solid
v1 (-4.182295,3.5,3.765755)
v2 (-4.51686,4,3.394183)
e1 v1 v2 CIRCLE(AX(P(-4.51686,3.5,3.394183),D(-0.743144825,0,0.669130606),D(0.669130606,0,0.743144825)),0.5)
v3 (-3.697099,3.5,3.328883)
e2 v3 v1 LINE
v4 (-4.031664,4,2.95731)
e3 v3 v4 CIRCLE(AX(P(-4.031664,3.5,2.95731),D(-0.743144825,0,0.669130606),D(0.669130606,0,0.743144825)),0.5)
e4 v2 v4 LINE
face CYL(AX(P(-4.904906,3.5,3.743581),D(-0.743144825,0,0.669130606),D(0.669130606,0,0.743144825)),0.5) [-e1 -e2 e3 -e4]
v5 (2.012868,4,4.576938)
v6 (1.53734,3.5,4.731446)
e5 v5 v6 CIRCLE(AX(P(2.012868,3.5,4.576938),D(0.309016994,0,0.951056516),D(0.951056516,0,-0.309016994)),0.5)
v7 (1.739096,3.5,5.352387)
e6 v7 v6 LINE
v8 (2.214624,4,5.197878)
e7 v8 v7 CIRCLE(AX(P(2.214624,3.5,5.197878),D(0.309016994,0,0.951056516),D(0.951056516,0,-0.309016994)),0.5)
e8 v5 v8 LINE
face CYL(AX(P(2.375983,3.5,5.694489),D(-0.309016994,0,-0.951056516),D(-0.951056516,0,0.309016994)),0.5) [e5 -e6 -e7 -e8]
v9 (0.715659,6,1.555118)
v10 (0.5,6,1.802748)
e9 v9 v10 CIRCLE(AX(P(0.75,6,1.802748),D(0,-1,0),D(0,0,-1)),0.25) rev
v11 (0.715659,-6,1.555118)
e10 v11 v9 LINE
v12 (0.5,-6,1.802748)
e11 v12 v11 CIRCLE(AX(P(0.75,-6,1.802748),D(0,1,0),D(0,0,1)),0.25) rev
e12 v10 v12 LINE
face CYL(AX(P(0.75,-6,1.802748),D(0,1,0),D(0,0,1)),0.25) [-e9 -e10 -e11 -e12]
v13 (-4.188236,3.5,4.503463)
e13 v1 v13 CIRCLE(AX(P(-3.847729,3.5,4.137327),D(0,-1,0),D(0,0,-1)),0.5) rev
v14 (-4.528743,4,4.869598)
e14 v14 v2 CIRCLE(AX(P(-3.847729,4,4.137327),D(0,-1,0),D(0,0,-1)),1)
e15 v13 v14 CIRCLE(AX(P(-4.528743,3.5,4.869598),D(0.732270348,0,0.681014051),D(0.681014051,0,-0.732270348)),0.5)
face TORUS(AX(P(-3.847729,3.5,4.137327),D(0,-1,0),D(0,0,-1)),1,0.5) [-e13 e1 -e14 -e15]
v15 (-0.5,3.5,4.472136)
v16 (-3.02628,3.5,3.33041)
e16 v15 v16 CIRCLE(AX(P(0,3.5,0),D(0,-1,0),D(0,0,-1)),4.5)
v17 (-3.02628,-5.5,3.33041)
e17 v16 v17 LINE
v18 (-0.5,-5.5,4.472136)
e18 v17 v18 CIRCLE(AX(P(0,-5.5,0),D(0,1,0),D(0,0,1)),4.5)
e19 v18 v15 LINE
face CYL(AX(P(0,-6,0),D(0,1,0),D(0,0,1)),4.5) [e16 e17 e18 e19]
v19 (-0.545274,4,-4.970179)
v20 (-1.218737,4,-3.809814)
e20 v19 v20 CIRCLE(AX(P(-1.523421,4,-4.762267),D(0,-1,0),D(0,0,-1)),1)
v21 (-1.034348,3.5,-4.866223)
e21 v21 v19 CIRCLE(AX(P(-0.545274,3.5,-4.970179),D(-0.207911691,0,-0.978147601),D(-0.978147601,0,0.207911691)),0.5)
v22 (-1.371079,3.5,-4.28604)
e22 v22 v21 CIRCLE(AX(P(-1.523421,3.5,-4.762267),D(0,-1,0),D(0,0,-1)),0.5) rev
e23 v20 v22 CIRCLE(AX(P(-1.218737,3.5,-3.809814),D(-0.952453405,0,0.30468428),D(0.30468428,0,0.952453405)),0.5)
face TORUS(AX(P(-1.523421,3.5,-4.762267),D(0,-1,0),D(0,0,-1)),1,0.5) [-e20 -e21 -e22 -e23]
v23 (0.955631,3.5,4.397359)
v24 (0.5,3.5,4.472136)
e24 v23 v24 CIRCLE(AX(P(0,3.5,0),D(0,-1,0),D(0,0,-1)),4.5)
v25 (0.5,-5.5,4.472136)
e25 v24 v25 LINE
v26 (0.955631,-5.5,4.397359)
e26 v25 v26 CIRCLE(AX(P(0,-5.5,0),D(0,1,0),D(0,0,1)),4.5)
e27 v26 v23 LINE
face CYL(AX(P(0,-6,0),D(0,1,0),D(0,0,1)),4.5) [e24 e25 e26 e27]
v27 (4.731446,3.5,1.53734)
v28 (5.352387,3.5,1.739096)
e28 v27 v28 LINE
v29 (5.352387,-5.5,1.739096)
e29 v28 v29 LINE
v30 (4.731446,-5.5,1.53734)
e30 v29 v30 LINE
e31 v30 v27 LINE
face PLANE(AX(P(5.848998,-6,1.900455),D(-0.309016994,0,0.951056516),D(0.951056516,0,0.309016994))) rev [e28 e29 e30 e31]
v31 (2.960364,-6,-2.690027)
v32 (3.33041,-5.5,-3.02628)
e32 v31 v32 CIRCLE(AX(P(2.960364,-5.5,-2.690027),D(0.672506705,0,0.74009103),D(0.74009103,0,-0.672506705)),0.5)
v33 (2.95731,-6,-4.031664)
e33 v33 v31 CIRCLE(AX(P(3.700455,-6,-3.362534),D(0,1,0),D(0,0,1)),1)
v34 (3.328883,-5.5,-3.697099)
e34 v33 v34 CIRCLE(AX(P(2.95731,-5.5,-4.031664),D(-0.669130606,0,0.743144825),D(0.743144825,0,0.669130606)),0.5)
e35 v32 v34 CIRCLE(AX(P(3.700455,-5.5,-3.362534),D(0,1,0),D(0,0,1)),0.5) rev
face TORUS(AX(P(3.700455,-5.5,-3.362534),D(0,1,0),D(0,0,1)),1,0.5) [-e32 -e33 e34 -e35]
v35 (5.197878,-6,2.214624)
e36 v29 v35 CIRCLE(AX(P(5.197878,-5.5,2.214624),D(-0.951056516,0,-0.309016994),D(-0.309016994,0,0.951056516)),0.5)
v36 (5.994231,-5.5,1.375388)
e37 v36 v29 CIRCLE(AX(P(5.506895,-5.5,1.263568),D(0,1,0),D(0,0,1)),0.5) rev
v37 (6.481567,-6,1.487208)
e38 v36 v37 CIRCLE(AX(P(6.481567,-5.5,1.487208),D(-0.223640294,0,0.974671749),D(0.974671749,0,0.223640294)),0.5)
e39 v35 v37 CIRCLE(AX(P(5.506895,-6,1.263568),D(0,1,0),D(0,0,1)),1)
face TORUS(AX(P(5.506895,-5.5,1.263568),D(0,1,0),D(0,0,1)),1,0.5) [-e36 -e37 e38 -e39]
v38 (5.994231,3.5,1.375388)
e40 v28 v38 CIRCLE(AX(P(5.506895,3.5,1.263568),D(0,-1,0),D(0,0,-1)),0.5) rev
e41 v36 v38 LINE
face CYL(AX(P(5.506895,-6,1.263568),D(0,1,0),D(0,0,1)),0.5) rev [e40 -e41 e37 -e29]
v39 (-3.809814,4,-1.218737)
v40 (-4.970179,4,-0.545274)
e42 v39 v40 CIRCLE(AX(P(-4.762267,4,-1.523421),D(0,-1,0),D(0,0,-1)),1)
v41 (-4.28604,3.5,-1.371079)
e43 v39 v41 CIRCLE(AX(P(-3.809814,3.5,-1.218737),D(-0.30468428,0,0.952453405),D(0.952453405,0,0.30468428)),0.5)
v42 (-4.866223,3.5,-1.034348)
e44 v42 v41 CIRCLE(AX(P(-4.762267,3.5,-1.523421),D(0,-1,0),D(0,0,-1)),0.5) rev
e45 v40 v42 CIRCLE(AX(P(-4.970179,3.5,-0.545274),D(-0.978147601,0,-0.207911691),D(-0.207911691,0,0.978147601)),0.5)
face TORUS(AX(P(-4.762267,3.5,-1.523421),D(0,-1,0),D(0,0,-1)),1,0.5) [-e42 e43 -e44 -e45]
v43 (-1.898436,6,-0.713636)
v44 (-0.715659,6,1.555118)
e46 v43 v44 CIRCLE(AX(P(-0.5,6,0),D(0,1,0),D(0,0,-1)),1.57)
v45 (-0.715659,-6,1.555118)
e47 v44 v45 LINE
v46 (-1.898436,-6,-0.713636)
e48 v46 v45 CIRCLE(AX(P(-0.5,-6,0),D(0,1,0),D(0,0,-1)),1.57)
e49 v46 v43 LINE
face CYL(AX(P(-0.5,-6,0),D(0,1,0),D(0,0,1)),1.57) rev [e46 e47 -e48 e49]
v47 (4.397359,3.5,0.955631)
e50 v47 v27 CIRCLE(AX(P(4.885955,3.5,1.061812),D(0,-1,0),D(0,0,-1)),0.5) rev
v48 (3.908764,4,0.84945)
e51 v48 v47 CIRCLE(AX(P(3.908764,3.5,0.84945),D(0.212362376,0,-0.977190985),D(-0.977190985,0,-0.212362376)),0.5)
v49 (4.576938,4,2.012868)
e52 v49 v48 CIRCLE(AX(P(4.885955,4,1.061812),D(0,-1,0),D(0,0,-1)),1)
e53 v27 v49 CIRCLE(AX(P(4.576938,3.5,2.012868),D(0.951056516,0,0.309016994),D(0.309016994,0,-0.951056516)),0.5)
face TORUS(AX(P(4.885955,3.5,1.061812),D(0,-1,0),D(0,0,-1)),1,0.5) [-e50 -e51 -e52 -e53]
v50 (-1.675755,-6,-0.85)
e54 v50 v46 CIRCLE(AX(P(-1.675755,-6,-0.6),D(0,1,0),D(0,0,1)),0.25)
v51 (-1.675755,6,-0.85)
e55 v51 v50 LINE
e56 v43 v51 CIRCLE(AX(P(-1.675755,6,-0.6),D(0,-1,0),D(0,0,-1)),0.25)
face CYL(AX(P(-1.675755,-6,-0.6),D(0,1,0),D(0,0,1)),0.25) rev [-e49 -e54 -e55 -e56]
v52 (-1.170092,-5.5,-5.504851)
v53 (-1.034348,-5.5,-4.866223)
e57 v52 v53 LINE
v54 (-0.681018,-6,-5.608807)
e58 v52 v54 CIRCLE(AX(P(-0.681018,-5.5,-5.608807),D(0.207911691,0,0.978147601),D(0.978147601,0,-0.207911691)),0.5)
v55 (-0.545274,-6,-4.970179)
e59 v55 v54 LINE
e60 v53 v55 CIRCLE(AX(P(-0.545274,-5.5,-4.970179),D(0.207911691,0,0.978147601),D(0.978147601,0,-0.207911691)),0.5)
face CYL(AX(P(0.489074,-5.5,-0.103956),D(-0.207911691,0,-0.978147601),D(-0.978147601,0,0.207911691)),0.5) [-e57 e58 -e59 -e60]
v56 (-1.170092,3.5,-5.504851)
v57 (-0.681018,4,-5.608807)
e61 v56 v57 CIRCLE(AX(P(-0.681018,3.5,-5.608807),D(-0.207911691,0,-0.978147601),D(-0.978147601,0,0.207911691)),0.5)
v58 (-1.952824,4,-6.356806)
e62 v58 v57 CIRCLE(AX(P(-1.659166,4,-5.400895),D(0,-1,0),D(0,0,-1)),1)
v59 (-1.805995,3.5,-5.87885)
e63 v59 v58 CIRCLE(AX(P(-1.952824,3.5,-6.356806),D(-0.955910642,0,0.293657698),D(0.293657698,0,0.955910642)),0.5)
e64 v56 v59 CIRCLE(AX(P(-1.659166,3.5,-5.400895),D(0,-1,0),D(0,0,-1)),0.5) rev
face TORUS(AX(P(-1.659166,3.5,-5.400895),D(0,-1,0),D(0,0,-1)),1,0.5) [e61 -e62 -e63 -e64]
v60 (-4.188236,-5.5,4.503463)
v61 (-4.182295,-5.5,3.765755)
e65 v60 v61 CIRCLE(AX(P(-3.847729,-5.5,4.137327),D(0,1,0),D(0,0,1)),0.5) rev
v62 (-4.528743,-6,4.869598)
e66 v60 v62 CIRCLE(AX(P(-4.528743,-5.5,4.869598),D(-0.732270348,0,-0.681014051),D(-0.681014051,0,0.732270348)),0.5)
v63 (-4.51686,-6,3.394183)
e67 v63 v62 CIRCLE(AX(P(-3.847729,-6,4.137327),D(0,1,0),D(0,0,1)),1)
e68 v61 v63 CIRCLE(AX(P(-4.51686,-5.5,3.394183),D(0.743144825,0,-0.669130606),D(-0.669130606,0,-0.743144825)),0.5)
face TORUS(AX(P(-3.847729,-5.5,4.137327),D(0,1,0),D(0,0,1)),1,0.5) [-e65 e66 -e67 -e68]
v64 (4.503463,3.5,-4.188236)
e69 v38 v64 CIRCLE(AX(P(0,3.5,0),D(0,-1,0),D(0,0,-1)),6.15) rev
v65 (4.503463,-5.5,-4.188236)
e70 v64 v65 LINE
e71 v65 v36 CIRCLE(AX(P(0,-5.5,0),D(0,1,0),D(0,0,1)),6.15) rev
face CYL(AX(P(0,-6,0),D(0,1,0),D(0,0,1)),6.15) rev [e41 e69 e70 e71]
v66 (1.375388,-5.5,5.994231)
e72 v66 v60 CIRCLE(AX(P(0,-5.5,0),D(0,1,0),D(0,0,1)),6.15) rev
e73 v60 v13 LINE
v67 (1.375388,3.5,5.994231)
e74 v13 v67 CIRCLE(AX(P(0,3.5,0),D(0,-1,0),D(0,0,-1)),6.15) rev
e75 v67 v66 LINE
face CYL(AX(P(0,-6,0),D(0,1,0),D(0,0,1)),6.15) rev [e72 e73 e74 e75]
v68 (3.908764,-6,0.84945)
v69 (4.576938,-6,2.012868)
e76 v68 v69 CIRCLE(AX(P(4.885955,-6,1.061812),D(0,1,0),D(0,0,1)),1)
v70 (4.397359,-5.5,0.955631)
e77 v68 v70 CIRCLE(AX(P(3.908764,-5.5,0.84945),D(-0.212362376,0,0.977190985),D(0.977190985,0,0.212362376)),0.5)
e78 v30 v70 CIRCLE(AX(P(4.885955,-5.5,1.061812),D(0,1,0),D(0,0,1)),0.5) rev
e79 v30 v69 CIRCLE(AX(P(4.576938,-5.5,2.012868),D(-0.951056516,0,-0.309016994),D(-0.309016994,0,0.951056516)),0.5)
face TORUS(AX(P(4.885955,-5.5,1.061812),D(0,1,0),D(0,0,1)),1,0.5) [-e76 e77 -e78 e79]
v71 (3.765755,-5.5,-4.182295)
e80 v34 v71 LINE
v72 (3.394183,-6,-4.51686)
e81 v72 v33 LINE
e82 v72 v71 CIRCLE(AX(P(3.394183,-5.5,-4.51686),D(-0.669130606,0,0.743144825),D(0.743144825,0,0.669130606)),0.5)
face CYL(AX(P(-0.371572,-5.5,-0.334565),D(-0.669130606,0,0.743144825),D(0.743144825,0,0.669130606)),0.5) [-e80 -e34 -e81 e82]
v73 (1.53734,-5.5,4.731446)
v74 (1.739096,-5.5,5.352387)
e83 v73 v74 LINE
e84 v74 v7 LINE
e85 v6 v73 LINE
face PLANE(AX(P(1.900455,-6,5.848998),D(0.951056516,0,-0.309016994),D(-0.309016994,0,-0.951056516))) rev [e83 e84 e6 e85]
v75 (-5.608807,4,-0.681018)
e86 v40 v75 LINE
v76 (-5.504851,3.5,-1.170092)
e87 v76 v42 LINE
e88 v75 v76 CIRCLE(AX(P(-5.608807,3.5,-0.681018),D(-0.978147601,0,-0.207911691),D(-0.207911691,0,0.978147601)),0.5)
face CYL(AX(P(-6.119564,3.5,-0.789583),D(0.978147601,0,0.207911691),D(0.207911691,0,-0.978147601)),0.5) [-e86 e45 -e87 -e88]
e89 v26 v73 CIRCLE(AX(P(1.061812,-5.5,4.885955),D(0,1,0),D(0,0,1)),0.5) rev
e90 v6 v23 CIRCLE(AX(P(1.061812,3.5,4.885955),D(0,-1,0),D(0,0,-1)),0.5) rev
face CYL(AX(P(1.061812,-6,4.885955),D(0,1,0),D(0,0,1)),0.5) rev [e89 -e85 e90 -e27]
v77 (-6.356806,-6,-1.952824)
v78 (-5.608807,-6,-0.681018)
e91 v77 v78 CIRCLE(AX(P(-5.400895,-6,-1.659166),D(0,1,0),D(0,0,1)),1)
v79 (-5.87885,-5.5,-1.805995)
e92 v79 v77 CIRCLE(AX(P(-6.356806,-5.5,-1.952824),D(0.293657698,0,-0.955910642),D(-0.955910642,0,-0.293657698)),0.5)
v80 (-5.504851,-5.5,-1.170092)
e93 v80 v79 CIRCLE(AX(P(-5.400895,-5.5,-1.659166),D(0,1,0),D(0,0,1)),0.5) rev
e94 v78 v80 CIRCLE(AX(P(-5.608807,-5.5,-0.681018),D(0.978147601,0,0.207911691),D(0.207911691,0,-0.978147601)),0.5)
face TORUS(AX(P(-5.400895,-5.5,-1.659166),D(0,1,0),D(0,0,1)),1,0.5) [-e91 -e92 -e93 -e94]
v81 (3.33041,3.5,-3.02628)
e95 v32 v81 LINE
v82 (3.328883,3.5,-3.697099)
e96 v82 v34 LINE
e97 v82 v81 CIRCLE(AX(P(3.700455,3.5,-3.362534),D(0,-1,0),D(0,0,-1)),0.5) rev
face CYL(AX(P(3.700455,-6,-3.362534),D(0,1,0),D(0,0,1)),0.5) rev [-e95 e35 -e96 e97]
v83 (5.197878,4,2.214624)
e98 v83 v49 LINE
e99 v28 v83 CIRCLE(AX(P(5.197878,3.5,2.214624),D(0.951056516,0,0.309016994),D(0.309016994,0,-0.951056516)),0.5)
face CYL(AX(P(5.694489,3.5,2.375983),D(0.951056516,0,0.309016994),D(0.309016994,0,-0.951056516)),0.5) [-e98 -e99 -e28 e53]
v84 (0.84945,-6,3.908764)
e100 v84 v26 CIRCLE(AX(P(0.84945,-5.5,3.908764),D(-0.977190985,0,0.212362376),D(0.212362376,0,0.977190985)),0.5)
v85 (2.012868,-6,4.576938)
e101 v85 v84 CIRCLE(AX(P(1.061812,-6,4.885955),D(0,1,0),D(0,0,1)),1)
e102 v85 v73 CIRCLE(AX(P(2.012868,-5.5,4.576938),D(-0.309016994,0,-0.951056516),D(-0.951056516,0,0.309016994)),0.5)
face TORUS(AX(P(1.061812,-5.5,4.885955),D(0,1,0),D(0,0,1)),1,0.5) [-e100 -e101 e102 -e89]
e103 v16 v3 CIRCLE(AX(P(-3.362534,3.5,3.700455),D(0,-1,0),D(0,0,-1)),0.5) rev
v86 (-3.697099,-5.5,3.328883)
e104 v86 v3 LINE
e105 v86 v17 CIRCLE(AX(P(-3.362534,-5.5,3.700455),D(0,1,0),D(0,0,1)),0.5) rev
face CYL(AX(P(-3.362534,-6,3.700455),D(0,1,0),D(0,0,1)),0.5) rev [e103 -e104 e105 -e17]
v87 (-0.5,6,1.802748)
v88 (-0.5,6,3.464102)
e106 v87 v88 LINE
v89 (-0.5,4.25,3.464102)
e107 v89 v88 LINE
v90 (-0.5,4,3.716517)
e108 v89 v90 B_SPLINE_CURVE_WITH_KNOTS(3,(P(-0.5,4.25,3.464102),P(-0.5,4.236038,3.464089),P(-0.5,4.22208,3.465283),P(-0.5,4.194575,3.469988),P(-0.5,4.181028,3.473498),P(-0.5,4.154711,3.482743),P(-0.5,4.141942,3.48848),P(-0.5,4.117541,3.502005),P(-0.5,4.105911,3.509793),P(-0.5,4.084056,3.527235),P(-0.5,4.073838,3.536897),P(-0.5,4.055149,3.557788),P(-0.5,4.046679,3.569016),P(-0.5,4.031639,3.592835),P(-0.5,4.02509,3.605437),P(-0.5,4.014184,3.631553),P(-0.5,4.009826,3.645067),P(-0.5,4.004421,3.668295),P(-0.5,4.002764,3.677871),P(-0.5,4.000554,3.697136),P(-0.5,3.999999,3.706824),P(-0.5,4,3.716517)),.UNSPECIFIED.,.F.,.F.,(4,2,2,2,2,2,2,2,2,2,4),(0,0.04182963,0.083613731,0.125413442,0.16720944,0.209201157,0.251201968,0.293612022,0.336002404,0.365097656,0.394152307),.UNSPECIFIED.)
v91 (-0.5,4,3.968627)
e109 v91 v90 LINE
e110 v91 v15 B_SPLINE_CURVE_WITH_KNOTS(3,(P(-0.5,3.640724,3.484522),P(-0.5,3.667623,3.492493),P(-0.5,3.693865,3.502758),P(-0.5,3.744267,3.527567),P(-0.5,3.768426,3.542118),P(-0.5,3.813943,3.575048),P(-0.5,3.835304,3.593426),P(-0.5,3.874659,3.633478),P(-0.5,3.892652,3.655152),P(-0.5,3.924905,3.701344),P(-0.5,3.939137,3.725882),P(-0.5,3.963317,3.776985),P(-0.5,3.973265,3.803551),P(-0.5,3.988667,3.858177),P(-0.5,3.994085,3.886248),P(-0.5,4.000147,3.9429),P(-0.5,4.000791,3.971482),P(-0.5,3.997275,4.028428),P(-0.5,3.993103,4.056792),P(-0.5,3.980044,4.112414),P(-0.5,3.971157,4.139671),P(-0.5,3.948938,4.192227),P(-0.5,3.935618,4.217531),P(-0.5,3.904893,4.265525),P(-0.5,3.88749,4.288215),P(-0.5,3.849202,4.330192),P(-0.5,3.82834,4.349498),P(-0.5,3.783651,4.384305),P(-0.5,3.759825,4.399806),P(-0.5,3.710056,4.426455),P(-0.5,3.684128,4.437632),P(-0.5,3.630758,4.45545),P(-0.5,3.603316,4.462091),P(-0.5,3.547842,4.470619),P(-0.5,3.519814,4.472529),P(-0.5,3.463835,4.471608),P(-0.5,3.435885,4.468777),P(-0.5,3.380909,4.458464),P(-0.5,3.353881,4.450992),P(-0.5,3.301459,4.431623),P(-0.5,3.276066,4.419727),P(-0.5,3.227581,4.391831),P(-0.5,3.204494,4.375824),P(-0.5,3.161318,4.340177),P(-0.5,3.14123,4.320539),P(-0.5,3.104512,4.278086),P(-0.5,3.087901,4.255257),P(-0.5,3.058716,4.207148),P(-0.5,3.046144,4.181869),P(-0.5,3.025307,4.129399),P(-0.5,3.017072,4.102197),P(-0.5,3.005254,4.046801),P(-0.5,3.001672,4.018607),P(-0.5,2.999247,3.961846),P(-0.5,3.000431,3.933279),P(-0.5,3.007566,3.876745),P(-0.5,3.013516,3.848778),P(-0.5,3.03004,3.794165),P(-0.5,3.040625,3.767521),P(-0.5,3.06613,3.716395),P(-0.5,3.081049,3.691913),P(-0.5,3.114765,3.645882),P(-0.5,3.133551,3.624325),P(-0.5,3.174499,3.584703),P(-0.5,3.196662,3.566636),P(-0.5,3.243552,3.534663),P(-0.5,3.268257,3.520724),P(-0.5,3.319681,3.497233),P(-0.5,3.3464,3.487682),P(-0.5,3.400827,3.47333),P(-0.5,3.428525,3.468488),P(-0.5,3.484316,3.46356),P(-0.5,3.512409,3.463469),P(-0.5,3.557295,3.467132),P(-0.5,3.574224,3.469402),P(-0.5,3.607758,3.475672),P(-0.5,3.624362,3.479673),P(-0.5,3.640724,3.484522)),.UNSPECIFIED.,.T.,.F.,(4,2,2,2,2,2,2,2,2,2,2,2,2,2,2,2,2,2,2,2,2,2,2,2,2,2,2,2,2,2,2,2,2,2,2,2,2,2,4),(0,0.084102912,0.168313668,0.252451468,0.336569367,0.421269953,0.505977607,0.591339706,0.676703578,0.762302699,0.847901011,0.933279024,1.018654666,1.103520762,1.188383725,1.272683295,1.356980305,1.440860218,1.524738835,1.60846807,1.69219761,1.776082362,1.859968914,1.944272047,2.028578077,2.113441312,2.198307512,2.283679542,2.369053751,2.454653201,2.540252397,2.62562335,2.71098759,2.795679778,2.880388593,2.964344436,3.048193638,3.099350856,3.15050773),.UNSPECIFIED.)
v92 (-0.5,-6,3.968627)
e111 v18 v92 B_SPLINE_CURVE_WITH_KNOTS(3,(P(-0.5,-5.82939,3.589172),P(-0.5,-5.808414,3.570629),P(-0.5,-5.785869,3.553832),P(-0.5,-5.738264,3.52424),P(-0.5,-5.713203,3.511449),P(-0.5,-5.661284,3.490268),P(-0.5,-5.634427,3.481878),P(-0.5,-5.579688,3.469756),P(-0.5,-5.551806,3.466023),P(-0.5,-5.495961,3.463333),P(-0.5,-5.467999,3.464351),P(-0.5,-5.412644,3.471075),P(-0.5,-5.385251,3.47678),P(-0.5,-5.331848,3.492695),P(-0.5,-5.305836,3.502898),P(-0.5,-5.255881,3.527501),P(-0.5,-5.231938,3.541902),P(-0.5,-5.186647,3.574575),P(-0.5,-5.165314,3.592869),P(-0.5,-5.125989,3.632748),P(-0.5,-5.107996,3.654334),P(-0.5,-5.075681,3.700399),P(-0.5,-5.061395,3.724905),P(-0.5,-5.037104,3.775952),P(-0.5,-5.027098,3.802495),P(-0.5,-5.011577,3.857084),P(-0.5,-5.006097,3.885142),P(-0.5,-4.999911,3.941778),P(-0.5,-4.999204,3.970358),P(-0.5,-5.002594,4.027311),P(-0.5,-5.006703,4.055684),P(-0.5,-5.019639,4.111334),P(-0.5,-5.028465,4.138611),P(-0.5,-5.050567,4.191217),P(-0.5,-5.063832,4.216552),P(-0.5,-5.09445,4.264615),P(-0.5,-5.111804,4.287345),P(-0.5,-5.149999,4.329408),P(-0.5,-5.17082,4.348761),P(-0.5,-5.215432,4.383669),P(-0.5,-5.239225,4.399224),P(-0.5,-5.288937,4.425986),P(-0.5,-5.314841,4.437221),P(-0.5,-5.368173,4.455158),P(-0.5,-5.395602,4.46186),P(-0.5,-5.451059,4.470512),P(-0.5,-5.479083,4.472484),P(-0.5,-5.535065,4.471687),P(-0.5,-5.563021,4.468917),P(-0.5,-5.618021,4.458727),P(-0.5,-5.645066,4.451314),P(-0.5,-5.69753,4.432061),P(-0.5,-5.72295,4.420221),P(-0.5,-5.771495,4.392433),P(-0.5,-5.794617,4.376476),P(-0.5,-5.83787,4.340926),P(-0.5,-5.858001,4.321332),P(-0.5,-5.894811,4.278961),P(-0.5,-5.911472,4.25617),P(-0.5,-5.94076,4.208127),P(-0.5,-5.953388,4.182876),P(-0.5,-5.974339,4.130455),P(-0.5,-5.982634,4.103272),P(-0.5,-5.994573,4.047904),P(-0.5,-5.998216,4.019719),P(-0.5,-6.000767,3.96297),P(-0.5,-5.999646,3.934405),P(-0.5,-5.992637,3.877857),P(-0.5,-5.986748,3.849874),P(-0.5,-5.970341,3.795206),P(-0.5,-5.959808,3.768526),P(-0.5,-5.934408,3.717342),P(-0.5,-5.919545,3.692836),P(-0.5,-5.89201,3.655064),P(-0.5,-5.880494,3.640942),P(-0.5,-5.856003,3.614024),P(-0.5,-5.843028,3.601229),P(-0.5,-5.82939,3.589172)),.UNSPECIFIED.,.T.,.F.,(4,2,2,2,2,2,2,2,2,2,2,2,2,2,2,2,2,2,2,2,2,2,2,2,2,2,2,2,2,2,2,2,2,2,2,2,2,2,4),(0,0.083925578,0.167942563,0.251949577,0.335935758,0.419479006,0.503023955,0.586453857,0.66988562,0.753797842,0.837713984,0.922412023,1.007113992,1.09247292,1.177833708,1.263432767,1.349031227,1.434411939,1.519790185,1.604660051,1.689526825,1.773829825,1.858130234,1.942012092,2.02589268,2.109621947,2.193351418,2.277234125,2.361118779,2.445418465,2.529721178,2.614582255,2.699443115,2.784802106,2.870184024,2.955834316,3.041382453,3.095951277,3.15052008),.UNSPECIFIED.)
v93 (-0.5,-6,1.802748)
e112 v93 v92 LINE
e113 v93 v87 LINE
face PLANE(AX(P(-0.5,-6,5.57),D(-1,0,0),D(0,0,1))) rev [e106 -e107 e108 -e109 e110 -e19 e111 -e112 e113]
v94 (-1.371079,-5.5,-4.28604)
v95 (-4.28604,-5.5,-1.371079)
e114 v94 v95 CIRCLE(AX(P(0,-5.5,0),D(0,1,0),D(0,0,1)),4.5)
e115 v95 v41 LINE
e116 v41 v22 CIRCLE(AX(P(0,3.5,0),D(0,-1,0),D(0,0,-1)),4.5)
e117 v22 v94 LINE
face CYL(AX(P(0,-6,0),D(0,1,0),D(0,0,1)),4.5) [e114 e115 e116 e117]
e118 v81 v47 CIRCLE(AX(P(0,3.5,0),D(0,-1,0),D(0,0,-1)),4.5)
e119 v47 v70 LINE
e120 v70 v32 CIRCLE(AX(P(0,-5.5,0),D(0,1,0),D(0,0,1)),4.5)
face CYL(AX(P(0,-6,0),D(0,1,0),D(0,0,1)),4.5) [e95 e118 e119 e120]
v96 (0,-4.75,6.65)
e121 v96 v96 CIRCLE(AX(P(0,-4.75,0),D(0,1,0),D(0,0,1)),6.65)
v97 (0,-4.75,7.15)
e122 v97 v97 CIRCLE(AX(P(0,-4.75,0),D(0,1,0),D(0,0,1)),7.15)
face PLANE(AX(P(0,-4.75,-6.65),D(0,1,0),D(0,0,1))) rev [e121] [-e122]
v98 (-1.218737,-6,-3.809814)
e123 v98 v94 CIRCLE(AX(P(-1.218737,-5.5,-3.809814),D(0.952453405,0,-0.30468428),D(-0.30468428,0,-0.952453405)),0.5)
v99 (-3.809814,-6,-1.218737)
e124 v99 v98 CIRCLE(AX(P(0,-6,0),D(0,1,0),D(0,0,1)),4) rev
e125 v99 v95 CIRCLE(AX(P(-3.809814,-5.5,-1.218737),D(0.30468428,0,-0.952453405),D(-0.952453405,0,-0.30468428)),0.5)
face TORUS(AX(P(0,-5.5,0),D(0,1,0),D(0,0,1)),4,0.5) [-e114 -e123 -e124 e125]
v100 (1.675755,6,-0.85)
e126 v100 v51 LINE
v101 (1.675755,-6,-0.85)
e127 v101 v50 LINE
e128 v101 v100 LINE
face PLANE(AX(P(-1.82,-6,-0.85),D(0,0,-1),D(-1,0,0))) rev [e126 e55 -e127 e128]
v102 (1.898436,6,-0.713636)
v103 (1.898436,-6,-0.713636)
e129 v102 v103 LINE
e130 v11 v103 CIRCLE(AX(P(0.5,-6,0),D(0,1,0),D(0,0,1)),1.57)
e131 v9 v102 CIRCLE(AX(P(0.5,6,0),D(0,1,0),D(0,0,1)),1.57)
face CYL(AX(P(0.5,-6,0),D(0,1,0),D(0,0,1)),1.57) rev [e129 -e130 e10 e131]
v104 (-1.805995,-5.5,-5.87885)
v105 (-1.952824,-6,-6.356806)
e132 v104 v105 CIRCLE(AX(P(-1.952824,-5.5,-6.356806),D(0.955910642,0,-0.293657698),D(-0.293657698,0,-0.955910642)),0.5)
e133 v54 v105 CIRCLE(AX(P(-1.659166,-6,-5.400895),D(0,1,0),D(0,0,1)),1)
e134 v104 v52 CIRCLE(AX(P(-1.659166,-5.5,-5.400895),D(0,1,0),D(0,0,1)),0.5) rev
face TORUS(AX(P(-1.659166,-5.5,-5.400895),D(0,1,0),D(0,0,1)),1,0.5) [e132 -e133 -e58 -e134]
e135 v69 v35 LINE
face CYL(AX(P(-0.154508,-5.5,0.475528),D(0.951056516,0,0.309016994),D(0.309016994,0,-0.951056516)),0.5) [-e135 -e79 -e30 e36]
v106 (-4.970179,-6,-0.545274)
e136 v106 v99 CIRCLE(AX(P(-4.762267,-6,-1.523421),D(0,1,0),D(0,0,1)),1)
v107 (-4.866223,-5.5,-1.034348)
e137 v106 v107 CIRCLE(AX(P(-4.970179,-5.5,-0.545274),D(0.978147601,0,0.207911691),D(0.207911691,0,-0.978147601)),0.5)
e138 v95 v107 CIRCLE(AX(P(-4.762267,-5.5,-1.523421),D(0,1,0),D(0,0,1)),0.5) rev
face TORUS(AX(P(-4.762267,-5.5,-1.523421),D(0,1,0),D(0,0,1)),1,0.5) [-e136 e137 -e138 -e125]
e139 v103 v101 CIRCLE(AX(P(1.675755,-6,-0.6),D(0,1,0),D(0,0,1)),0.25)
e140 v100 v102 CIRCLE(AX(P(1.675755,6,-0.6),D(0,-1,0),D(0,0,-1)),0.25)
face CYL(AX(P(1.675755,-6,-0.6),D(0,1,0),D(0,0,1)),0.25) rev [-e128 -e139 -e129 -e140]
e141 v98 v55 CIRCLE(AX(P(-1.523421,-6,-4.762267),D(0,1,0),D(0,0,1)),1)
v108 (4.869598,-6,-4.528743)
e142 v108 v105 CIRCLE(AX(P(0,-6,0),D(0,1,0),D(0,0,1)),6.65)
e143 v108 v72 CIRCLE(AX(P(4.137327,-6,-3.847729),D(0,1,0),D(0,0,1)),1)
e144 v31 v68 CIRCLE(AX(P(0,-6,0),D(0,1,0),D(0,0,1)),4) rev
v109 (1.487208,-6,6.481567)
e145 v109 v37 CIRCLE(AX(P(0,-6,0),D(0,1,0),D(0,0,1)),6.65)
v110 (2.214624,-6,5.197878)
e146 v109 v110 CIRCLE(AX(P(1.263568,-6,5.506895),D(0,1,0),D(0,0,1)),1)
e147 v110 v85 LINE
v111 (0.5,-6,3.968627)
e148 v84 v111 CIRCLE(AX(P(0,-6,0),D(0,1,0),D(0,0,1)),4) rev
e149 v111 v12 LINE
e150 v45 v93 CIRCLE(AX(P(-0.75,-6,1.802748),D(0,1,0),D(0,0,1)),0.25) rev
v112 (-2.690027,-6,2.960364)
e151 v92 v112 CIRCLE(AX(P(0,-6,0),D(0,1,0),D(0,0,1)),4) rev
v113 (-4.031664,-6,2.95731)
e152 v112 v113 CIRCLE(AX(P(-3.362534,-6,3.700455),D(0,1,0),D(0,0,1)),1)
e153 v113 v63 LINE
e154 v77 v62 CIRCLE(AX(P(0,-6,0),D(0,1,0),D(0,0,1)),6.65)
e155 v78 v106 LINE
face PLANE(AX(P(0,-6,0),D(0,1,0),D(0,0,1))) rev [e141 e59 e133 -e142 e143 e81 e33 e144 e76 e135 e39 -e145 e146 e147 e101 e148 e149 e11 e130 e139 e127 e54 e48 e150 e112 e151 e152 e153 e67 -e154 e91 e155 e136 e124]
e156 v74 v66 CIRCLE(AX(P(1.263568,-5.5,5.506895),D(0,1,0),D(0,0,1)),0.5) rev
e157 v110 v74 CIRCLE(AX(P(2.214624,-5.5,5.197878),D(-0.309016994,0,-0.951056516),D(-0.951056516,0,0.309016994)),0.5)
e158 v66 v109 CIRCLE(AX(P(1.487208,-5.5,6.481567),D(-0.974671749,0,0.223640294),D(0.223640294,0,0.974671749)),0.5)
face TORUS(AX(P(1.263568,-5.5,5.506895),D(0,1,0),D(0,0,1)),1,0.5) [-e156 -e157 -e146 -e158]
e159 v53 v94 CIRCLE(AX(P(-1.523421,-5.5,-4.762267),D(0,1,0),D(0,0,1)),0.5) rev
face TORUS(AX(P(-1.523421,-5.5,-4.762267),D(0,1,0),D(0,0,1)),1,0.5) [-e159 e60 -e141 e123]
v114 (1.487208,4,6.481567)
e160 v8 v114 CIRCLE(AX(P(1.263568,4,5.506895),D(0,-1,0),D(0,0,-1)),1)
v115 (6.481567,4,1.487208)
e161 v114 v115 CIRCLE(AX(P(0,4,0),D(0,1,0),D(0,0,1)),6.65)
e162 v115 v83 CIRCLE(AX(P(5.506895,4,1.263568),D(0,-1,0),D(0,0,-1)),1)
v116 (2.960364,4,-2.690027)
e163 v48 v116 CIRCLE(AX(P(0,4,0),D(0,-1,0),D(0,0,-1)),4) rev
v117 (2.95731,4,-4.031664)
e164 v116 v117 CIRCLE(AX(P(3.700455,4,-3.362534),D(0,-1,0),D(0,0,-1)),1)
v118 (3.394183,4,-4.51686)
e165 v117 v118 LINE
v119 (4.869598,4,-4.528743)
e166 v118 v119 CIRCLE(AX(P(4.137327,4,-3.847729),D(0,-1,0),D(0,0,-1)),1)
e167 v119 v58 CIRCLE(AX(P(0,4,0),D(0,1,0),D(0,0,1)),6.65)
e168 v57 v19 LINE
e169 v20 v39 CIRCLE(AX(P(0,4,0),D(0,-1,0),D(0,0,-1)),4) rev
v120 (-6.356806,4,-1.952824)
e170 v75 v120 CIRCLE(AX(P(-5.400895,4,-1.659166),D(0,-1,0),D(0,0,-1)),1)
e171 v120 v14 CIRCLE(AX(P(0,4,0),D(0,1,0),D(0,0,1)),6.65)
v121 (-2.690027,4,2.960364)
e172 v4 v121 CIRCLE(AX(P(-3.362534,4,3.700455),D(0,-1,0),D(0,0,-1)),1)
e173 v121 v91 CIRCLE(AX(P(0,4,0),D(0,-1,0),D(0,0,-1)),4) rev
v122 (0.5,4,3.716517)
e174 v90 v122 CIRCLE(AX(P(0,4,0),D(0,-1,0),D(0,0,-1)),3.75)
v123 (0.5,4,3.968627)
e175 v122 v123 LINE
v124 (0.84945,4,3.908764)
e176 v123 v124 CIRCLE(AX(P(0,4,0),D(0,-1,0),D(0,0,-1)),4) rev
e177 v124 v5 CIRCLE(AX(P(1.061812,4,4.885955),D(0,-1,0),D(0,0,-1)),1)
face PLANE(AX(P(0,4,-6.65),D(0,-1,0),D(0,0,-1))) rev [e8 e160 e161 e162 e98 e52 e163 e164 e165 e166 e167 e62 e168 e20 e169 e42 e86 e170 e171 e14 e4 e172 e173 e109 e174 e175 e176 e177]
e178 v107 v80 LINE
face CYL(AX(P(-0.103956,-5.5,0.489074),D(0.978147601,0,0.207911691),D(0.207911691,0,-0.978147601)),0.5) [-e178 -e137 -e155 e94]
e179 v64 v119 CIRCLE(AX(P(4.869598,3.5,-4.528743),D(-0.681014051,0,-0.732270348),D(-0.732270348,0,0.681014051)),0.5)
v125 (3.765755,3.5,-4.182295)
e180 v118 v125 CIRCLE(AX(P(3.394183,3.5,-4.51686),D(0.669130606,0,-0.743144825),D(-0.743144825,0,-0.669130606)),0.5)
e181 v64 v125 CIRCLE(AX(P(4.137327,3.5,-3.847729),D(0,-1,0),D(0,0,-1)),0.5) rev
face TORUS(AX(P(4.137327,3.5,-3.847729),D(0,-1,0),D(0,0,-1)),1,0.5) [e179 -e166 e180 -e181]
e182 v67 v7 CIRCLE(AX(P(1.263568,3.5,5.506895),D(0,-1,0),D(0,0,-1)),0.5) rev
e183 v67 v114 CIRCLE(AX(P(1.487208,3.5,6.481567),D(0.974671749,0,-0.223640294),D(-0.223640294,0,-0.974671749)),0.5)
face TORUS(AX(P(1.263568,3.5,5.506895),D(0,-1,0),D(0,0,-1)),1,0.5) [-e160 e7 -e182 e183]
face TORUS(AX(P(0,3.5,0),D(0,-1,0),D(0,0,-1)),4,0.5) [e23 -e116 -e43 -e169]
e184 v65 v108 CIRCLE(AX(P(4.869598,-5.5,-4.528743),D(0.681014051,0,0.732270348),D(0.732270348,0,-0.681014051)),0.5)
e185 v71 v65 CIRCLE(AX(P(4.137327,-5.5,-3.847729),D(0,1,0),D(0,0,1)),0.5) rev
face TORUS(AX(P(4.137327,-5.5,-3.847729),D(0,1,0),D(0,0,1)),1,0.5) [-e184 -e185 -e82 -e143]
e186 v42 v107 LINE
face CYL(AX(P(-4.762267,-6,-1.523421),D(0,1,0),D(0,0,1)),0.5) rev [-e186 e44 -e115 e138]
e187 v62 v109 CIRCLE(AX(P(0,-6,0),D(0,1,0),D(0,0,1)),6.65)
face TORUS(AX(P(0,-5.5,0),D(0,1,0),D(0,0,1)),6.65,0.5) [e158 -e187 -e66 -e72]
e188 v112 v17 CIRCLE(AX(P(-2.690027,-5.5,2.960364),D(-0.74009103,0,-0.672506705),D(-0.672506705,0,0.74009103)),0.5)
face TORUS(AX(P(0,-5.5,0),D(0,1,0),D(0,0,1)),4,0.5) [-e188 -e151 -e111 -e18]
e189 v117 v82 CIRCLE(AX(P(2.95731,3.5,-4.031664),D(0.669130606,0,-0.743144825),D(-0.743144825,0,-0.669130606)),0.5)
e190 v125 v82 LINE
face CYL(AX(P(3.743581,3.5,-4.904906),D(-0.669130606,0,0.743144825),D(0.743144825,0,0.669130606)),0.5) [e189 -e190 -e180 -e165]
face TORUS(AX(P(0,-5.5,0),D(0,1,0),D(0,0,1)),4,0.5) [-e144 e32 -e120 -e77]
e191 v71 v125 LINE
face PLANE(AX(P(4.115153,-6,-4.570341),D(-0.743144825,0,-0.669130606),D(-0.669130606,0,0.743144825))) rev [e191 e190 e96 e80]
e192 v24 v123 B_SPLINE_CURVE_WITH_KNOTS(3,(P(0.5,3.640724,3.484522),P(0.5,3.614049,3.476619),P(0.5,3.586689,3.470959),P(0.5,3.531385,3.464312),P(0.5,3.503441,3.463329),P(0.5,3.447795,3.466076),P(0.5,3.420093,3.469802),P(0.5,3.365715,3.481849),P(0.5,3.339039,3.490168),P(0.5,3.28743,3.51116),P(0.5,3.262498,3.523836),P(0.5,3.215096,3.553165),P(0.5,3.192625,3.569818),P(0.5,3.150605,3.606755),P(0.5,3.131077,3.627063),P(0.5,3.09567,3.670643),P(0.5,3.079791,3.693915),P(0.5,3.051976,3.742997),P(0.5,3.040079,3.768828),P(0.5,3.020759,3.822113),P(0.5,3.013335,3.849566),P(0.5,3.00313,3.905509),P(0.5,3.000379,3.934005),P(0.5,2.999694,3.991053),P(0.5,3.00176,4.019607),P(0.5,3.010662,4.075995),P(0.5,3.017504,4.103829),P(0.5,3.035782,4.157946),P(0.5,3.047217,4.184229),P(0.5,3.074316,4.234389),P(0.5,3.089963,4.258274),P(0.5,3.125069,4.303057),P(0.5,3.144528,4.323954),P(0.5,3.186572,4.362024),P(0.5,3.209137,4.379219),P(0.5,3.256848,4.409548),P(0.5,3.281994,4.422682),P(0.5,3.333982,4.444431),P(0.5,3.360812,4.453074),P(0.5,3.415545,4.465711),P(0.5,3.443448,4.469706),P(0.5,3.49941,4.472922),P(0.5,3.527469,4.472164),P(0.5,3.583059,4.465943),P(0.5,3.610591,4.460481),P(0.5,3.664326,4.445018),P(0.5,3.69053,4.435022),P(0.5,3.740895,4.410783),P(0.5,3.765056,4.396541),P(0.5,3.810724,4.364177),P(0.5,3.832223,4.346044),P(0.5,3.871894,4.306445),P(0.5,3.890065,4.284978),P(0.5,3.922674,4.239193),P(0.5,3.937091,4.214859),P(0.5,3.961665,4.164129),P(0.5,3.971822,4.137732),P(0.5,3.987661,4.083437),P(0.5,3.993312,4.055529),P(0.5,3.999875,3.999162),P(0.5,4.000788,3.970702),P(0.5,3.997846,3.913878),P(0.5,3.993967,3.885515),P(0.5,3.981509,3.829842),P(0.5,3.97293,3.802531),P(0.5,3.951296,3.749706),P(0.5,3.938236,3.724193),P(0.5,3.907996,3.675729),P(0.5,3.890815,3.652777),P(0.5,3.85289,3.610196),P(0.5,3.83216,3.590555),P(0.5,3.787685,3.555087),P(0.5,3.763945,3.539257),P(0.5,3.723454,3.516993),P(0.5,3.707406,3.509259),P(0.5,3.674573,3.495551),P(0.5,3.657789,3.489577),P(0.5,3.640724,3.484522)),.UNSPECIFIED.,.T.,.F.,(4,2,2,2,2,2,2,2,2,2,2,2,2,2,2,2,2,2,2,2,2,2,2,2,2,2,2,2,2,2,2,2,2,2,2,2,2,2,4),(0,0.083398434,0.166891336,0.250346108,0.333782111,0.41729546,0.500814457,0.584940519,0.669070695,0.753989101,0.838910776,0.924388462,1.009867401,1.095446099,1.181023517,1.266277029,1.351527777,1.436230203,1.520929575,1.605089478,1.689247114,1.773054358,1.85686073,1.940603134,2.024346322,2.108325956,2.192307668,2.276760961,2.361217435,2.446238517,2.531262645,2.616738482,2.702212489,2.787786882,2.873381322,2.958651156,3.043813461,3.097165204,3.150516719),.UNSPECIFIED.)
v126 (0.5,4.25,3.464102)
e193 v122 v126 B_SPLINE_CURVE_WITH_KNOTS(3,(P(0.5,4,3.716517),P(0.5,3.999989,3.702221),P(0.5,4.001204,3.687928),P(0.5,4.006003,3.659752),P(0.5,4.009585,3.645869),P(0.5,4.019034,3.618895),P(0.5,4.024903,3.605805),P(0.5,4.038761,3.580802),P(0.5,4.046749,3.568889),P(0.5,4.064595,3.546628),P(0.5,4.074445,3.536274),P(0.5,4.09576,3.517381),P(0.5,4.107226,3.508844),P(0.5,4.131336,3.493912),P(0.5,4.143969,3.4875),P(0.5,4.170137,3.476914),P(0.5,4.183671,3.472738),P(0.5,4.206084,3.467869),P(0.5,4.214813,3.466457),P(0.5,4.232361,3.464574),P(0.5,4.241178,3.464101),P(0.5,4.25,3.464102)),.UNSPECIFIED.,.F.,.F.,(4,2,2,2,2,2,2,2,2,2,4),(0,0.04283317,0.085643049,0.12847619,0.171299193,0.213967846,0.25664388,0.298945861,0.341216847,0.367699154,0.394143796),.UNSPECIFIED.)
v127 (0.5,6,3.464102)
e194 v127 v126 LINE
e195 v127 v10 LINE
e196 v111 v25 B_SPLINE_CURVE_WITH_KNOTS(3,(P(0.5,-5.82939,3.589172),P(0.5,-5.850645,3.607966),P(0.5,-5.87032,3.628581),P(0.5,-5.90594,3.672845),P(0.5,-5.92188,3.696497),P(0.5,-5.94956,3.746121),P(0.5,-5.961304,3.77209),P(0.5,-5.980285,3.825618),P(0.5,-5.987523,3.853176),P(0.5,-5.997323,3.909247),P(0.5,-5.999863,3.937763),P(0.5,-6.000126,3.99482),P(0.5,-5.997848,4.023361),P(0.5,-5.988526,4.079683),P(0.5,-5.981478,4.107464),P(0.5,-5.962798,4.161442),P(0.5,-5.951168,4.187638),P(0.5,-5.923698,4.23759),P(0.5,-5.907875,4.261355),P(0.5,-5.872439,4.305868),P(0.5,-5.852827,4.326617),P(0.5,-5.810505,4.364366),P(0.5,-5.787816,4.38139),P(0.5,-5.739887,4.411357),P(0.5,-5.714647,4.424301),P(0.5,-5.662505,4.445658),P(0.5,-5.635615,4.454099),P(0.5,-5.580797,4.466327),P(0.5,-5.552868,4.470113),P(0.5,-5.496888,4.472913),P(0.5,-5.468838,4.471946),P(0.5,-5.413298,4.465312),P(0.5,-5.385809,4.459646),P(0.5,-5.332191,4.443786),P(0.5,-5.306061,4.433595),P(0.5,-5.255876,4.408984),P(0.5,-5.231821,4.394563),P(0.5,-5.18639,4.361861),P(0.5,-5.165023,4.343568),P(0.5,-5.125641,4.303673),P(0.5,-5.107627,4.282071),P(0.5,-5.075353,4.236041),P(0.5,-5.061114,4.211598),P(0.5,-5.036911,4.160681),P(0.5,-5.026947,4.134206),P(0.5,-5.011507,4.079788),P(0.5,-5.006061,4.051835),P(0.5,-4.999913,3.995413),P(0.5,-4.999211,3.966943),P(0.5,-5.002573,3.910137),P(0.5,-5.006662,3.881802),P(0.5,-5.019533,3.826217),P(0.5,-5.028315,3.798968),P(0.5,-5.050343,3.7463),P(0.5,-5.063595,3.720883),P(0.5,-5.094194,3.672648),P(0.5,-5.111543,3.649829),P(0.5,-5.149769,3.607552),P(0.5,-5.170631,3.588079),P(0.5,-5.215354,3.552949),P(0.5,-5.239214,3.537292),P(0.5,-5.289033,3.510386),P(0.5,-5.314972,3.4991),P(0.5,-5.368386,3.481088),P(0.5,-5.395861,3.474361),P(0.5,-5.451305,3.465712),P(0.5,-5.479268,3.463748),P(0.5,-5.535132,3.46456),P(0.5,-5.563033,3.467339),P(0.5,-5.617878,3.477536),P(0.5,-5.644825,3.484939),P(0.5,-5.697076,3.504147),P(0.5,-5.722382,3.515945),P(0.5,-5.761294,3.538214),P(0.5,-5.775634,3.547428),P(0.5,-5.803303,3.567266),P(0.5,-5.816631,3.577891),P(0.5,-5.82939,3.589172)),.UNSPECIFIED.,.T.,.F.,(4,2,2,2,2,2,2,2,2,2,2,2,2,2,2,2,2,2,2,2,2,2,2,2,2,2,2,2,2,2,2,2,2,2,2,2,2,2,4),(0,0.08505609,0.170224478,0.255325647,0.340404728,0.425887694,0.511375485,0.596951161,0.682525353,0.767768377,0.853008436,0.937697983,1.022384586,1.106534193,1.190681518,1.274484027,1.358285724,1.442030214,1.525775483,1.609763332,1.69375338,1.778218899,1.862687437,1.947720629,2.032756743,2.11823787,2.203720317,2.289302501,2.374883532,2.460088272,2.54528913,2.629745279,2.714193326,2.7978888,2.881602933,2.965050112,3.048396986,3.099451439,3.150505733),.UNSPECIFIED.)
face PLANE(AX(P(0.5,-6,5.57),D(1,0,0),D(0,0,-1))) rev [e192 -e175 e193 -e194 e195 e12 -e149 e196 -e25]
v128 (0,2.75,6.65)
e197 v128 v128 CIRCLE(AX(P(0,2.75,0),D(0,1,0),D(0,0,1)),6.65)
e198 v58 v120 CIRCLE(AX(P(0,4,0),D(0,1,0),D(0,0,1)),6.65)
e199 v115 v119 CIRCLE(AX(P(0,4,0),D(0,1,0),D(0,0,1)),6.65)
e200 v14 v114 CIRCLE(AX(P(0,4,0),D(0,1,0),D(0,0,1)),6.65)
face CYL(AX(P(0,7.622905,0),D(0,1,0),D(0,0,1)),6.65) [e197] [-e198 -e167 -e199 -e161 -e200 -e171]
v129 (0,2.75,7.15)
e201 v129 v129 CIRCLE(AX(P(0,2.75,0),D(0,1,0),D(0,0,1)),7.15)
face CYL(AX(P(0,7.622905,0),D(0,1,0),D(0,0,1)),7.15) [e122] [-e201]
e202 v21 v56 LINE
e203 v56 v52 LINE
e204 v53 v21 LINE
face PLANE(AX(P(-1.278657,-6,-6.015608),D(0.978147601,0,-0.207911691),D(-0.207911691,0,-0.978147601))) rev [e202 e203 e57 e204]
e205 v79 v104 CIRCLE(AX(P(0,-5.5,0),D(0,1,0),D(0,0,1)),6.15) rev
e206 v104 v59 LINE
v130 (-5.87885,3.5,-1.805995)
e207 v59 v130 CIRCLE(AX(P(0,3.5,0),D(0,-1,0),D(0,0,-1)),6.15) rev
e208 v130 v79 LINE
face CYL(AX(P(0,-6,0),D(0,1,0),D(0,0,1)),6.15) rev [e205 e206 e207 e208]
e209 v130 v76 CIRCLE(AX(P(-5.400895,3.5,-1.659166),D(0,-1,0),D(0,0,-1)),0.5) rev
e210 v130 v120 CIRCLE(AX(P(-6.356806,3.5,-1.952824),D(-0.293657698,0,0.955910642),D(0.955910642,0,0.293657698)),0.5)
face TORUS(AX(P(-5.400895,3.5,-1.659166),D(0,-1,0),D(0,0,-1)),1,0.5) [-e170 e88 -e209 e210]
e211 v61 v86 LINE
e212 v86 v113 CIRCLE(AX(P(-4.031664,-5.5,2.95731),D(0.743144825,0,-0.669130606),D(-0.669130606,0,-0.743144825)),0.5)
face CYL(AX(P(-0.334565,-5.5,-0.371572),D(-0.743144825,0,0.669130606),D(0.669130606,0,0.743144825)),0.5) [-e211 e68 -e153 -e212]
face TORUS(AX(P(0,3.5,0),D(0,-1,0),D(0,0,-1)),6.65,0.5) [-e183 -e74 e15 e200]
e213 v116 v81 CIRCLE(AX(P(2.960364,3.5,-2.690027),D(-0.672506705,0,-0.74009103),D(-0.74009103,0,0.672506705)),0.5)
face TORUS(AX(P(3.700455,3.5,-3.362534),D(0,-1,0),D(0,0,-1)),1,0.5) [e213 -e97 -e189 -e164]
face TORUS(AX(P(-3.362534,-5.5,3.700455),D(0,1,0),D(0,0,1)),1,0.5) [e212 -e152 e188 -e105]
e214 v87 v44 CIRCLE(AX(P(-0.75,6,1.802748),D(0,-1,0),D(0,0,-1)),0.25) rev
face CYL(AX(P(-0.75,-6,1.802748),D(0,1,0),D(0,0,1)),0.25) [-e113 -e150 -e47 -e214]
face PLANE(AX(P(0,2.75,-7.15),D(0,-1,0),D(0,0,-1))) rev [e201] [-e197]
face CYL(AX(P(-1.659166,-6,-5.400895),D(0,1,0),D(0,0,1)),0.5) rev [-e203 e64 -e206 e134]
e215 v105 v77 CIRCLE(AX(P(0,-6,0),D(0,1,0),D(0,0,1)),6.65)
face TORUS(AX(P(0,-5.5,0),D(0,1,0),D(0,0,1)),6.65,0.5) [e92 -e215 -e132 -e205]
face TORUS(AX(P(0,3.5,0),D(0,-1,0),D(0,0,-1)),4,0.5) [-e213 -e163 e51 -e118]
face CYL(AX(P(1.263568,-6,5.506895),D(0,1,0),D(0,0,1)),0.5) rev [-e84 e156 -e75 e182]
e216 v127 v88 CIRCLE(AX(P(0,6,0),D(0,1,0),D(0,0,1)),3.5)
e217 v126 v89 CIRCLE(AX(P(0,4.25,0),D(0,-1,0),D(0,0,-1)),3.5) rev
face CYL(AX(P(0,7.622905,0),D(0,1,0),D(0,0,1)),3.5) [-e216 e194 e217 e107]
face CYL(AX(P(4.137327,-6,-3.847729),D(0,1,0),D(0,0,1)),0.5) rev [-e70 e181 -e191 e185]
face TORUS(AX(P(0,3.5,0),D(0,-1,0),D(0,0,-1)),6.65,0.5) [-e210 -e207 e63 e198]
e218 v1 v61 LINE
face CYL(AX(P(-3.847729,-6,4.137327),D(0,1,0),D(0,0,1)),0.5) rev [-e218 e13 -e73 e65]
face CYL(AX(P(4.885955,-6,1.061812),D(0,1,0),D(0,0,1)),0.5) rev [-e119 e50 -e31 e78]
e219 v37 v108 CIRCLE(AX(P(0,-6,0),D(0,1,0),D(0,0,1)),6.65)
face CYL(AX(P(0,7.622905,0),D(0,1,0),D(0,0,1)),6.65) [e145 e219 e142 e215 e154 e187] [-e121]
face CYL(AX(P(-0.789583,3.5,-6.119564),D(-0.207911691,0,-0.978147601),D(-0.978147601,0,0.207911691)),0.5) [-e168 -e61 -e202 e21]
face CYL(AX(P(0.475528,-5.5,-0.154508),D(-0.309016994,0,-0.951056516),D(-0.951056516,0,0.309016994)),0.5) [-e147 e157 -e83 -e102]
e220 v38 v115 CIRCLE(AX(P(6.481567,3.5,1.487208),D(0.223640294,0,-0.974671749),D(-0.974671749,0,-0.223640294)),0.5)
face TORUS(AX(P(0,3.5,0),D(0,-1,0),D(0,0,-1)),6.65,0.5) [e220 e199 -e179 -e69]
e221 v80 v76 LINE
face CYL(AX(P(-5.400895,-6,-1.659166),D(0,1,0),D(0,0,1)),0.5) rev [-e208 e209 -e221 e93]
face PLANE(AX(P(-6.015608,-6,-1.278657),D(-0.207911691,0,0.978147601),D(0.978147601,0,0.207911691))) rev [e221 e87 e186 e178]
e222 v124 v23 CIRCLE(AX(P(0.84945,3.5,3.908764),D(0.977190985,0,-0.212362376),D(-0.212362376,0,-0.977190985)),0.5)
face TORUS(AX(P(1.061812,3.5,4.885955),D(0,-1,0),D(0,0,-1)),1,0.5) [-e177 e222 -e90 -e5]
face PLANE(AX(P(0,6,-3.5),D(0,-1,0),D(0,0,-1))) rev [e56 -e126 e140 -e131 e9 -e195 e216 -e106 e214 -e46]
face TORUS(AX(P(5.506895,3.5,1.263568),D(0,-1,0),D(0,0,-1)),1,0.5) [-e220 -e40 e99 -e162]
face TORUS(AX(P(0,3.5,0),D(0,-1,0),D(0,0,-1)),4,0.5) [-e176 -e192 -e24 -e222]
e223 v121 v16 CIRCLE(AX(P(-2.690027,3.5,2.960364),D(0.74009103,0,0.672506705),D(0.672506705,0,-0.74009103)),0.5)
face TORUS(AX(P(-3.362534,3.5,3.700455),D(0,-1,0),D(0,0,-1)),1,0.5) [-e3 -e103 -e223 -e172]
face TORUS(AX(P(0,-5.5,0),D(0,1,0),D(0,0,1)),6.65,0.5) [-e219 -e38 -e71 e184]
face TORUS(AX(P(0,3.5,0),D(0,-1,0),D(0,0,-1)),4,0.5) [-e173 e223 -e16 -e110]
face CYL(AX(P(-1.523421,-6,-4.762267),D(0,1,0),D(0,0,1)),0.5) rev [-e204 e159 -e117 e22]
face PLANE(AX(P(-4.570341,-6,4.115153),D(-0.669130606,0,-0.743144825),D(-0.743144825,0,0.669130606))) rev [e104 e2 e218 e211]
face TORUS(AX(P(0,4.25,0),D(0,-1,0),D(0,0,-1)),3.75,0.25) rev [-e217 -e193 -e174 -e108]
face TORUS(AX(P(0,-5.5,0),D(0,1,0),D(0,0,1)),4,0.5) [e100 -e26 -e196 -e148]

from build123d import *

# Parameters (mm, degrees)
CUT_EXTRUDE1_DEPTH       = 15.221286862
FILLET1_R                = 0.5
FILLET2_R                = 0.5
CIRPATTERN1_COUNT        = 3
FILLET1_OF_CIRPATTERN1_R = 0.5
FILLET2_OF_CIRPATTERN1_R = 0.5
CUT_EXTRUDE3_DEPTH       = 16.692195589
FILLET3_R                = 0.25
FILLET4_R                = 0.25


with BuildPart() as part:
    # Sketch1 → Revolve1 (revolve)
    with BuildSketch(Plane(origin=(0, 0, 0), x_dir=(0, 0, -1), z_dir=(1, 0, 0)), mode=Mode.PRIVATE) as revolve1_sk:
        Polygon((0, -6), (6.65, -6), (6.65, -4.75), (7.15, -4.75), (7.15, 2.75), (6.65, 2.75), (6.65, 4), (3.5, 4), (3.5, 6), (0, 6), align=None)
    revolve(revolve1_sk.sketch.rotate(Axis((0, 7.622905435, 0), (0, -1, 0)), 180), axis=Axis((0, 7.622905435, 0), (0, -1, 0)))

    # Sketch2 → Cut-Extrude1 (cut, through all)
    with BuildSketch(Plane(origin=(0, 4, 0), x_dir=(1, 0, 0), z_dir=(0, 1, 0))):
        with BuildLine():
            Line((-1.278656899, 6.015607745), (-0.935602609, 4.401664203))
            ThreePointArc((-0.935602609, 4.401664203), (-3.181980515, 3.181980515), (-4.401664203, 0.935602609))
            Line((-4.401664203, 0.935602609), (-6.015607745, 1.278656899))
            ThreePointArc((-6.015607745, 1.278656899), (-4.348706704, 4.348706704), (-1.278656899, 6.015607745))
        make_face()
    cut_extrude1 = extrude(amount=-CUT_EXTRUDE1_DEPTH, mode=Mode.SUBTRACT)

    # Fillet1
    fillet1_edges = [part.edges().sort_by_distance(p)[0] for p in [
        (-6.015607745, -1, -1.278656899),
        (-1.278656899, -1, -6.015607745),
        (-0.935602609, -1, -4.401664203),
        (-4.401664203, -1, -0.935602609),
    ]]
    fillet(fillet1_edges, radius=FILLET1_R)

    # Fillet2
    fillet2_edges = [part.edges().sort_by_distance(p)[0] for p in [
        (-3.181980515, 4, -3.181980515),
        (-3.181980515, -6, -3.181980515),
        (-5.185536923, 4, -1.102219899),
        (-5.185536923, -6, -1.102219899),
        (-4.348706704, 4, -4.348706704),
        (-4.348706704, -6, -4.348706704),
        (-1.102219899, 4, -5.185536923),
        (-1.102219899, -6, -5.185536923),
        (-4.511282066, 4, -1.090978863),
        (-4.511282066, -6, -1.090978863),
        (-1.405686601, 4, -5.831880276),
        (-1.405686601, -6, -5.831880276),
        (-5.831880276, 4, -1.405686601),
        (-5.831880276, -6, -1.405686601),
        (-1.090978863, 4, -4.511282066),
        (-1.090978863, -6, -4.511282066),
    ]]
    fillet(fillet2_edges, radius=FILLET2_R - 0.0001)  # a hair under: the kernel refuses the full size

    # CirPattern1: Cut-Extrude1 ×3 about axis
    cirpattern1_axis = Axis((0, 0, 0), (0, 1, 0))
    for i in range(1, CIRPATTERN1_COUNT):
        add(cut_extrude1.rotate(cirpattern1_axis, i * 360 / CIRPATTERN1_COUNT), mode=Mode.SUBTRACT)

    # Fillet1 of CirPattern1
    fillet1_of_cirpattern1_edges = [part.edges().sort_by_distance(p)[0] for p in [
        (1.900454515, -1, 5.848997575),
        (-4.570340677, -1, 4.115153229),
        (-3.344151715, -1, 3.011087729),
        (1.390576475, -1, 4.279754323),
        (4.115153229, -1, -4.570340677),
        (5.848997575, -1, 1.900454515),
        (4.279754323, -1, 1.390576475),
        (3.011087729, -1, -3.344151715),
    ]]
    fillet(fillet1_of_cirpattern1_edges, radius=FILLET1_OF_CIRPATTERN1_R)

    # Fillet2 of CirPattern1
    fillet2_of_cirpattern1_edges = [part.edges().sort_by_distance(p)[0] for p in [
        (-1.164685703, 4, 4.346666218),
        (-1.164685703, -6, 4.346666218),
        (1.638218029, 4, 5.041916657),
        (1.638218029, -6, 5.041916657),
        (-1.591737127, 4, 5.940443832),
        (-1.591737127, -6, 5.940443832),
        (-3.939696758, 4, 3.547318895),
        (-3.939696758, -6, 3.547318895),
        (1.310825622, 4, 4.452374304),
        (1.310825622, -6, 4.452374304),
        (-4.34771317, 4, 4.133300444),
        (-4.34771317, -6, 4.133300444),
        (1.698579831, 4, 5.753399771),
        (1.698579831, -6, 5.753399771),
        (-3.361395441, 4, 3.200456444),
        (-3.361395441, -6, 3.200456444),
        (4.346666218, 4, -1.164685703),
        (4.346666218, -6, -1.164685703),
        (3.547318895, 4, -3.939696758),
        (3.547318895, -6, -3.939696758),
        (5.940443832, 4, -1.591737127),
        (5.940443832, -6, -1.591737127),
        (5.041916657, 4, 1.638218029),
        (5.041916657, -6, 1.638218029),
        (3.200456444, 4, -3.361395441),
        (3.200456444, -6, -3.361395441),
        (5.753399771, 4, 1.698579831),
        (5.753399771, -6, 1.698579831),
        (4.133300444, 4, -4.34771317),
        (4.133300444, -6, -4.34771317),
        (4.452374304, 4, 1.310825622),
        (4.452374304, -6, 1.310825622),
    ]]
    fillet(fillet2_of_cirpattern1_edges, radius=FILLET2_OF_CIRPATTERN1_R - 0.0001)  # a hair under: the kernel refuses the full size

    # Sketch3 → Cut-Extrude3 (cut, through all)
    with BuildSketch(Plane(origin=(0, 6, 0), x_dir=(1, 0, 0), z_dir=(0, 1, 0))):
        with BuildLine():
            Line((-0.5, -5.57), (-0.5, -1.57))
            ThreePointArc((-0.5, -1.57), (-1.878296049, -0.751797845), (-1.82, 0.85))
            Line((-1.82, 0.85), (1.82, 0.85))
            ThreePointArc((1.82, 0.85), (1.878296049, -0.751797845), (0.5, -1.57))
            Line((0.5, -1.57), (0.5, -5.57))
            Line((0.5, -5.57), (-0.5, -5.57))
        make_face()
    extrude(amount=-CUT_EXTRUDE3_DEPTH, mode=Mode.SUBTRACT)

    # Fillet3
    fillet3_edges = [part.edges().sort_by_distance(p)[0] for p in [
        (0.5, 0, 1.57),
        (-0.5, 0, 1.57),
        (-1.82, 0, -0.85),
        (1.82, 0, -0.85),
    ]]
    fillet(fillet3_edges, radius=FILLET3_R)

    # Fillet4
    fillet4_edges = [part.edges().sort_by_distance(p)[0] for p in [
        (0, 4, -3.5),
    ]]
    fillet(fillet4_edges, radius=FILLET4_R)


solid = part.part
